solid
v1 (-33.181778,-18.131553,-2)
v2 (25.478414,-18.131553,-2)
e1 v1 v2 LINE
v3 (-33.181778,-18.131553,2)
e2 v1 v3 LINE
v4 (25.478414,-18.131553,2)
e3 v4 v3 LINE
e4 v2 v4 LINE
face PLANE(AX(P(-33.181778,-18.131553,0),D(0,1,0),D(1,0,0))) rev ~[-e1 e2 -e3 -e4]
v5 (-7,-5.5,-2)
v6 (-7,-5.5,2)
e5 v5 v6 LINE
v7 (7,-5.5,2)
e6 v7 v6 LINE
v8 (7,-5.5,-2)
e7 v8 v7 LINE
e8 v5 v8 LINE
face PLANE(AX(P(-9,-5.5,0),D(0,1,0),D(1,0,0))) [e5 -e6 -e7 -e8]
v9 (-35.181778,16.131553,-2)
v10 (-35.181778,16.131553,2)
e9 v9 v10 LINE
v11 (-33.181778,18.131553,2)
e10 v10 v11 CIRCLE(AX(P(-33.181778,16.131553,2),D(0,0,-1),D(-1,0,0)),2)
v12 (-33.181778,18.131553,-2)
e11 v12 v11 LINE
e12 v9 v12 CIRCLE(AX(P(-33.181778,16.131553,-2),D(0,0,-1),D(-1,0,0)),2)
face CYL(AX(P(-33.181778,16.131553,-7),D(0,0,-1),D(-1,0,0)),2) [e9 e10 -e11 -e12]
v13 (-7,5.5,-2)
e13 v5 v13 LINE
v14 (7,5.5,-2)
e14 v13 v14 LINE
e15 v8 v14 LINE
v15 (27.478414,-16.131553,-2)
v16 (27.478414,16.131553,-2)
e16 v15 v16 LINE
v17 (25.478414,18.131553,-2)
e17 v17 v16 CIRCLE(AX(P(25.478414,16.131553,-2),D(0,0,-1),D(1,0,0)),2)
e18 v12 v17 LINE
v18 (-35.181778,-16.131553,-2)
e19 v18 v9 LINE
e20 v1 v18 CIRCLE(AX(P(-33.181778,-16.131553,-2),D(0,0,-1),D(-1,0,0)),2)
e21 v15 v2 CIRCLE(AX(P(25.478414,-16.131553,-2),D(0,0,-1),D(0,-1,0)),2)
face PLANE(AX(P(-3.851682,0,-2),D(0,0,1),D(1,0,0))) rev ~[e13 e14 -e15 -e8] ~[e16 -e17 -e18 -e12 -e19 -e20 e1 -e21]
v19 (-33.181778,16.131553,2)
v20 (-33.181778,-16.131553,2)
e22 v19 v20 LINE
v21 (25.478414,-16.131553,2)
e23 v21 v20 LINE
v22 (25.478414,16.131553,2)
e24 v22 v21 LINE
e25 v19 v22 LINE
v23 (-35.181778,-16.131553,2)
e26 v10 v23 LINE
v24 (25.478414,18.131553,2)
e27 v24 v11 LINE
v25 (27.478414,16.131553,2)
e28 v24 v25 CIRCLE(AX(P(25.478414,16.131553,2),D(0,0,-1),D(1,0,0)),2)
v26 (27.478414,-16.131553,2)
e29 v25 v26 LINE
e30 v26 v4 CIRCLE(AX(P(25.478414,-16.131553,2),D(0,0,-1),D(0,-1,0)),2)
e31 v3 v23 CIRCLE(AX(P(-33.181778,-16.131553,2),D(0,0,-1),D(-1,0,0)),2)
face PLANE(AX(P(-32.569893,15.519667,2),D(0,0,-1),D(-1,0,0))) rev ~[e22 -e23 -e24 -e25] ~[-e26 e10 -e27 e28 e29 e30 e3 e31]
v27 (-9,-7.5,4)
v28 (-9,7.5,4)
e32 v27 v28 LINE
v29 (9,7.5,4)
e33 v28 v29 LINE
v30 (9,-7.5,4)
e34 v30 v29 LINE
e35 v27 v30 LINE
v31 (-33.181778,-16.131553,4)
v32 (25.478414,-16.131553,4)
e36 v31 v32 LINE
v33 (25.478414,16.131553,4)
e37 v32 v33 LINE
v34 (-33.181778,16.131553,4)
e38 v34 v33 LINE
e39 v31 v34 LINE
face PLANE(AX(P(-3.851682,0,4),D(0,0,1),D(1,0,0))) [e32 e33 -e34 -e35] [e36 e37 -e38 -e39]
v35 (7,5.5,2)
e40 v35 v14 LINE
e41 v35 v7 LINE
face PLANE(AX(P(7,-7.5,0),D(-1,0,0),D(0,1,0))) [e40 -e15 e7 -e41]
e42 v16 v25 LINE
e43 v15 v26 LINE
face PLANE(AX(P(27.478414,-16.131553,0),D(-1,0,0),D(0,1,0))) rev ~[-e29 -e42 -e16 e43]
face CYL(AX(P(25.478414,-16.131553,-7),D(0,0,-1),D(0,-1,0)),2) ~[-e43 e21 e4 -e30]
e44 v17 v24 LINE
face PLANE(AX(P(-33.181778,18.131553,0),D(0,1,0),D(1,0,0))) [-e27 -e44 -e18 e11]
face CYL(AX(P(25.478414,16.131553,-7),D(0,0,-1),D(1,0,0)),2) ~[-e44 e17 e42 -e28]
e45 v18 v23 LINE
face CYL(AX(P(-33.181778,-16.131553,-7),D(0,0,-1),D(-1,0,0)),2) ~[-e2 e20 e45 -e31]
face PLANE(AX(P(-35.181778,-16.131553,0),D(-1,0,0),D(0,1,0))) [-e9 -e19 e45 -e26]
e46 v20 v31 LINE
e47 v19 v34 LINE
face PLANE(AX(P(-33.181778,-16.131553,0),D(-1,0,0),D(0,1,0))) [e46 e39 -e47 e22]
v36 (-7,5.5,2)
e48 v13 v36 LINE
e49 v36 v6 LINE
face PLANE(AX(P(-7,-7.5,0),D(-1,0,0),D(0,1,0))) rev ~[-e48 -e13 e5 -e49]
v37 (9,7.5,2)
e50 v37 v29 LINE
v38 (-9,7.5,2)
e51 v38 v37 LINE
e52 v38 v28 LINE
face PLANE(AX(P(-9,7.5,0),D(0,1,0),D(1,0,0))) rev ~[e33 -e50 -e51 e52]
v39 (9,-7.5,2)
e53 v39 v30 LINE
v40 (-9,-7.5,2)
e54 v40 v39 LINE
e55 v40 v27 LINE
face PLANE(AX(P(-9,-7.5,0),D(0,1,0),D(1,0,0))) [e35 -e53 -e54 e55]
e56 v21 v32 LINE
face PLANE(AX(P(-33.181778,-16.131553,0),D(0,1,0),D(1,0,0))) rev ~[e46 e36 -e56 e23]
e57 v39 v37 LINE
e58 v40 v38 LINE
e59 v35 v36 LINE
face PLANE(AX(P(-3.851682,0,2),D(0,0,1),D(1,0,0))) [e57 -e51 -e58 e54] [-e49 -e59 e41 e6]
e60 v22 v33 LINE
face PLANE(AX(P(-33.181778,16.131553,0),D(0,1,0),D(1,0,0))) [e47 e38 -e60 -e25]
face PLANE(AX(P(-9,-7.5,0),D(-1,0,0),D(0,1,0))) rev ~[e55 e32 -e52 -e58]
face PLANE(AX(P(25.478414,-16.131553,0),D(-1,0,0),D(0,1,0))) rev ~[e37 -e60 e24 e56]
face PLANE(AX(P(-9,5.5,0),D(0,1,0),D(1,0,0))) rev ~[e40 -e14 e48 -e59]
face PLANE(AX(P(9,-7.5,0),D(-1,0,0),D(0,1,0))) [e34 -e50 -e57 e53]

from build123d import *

# Parameters (mm, degrees)
F0_W        = 58.6601923168
F0_H        = 32.2631057742
F0_W_2      = 18
F0_H_2      = 15
F1_DEPTH    = 2
F2_T        = 2
F3_T1_DEPTH = 2
F3_T3_DEPTH = 14
F4_DEPTH    = 4


# Not quite as in the source:
# - a fillet or chamfer that OpenCascade refuses, or shapes differently, is made with other operations: its cross-section is extruded or revolved along the edge and cut away or added
# - a feature names something its author has since deleted; it is built from what else it names


with BuildPart() as f1:
    # F0 (on Top) → F1 (new body)
    with BuildSketch(Plane.XY):
        with Locations((-3.8516821679, 0)):
            Rectangle(F0_W, F0_H)
        Rectangle(F0_W_2, F0_H_2, mode=Mode.SUBTRACT)
    extrude(amount=F1_DEPTH)

    # F2
    f2_openings = [f1.faces().sort_by_distance(p)[0] for p in [
        (24.808942, 0, 2),
    ]]
    offset(amount=F2_T, openings=f2_openings, kind=Kind.INTERSECTION)

    # F3: fillet of radius 2 on 8 edges, made by hand

    # F3_s2 → F3_t1 (join)
    with BuildSketch(Plane.XY):
        with BuildLine():
            ThreePointArc((-31.1817783263, 16.1315528871), (-32.5959918887, 15.5457664495), (-33.1817783263, 14.1315528871))
            Line((-33.1817783263, 14.1315528871), (-33.1817783263, 16.1315528871))
            Line((-33.1817783263, 16.1315528871), (-31.1817783263, 16.1315528871))
        make_face()
        with BuildLine():
            ThreePointArc((-33.1817783263, -14.1315528871), (-32.5959918887, -15.5457664495), (-31.1817783263, -16.1315528871))
            Line((-31.1817783263, -16.1315528871), (-33.1817783263, -16.1315528871))
            Line((-33.1817783263, -16.1315528871), (-33.1817783263, -14.1315528871))
        make_face()
        with BuildLine():
            ThreePointArc((25.4784139905, -14.1315528871), (24.8926275528, -15.5457664495), (23.4784139905, -16.1315528871))
            Line((23.4784139905, -16.1315528871), (25.4784139905, -16.1315528871))
            Line((25.4784139905, -16.1315528871), (25.4784139905, -14.1315528871))
        make_face()
        with BuildLine():
            ThreePointArc((25.4784139905, 14.1315528871), (24.8926275528, 15.5457664495), (23.4784139905, 16.1315528871))
            Line((23.4784139905, 16.1315528871), (25.4784139905, 16.1315528871))
            Line((25.4784139905, 16.1315528871), (25.4784139905, 14.1315528871))
        make_face()
    extrude(amount=F3_T1_DEPTH)

    # F3_s4 → F3_t3 (cut)
    with BuildSketch(Plane.XY.offset(-7)):
        with BuildLine():
            ThreePointArc((25.4784139905, -18.1315528871), (26.8926275528, -17.5457664495), (27.4784139905, -16.1315528871))
            Line((27.4784139905, -16.1315528871), (27.4784139905, -18.1315528871))
            Line((27.4784139905, -18.1315528871), (25.4784139905, -18.1315528871))
        make_face()
        with BuildLine():
            ThreePointArc((27.4784139905, 16.1315528871), (26.8926275528, 17.5457664495), (25.4784139905, 18.1315528871))
            Line((25.4784139905, 18.1315528871), (27.4784139905, 18.1315528871))
            Line((27.4784139905, 18.1315528871), (27.4784139905, 16.1315528871))
        make_face()
        with BuildLine():
            ThreePointArc((-35.1817783263, 16.1315528871), (-34.5959918887, 17.5457664495), (-33.1817783263, 18.1315528871))
            Line((-33.1817783263, 18.1315528871), (-35.1817783263, 18.1315528871))
            Line((-35.1817783263, 18.1315528871), (-35.1817783263, 16.1315528871))
        make_face()
        with BuildLine():
            ThreePointArc((-35.1817783263, -16.1315528871), (-34.5959918887, -17.5457664495), (-33.1817783263, -18.1315528871))
            Line((-33.1817783263, -18.1315528871), (-35.1817783263, -18.1315528871))
            Line((-35.1817783263, -18.1315528871), (-35.1817783263, -16.1315528871))
        make_face()
    extrude(amount=F3_T3_DEPTH, mode=Mode.SUBTRACT)

    # F0 (on Top) → F4 (join)
    with BuildSketch(Plane.XY):
        with Locations((-3.8516821679, 0)):
            Rectangle(F0_W, F0_H)
        Rectangle(F0_W_2, F0_H_2, mode=Mode.SUBTRACT)
    extrude(amount=F4_DEPTH)


solid = f1.part
